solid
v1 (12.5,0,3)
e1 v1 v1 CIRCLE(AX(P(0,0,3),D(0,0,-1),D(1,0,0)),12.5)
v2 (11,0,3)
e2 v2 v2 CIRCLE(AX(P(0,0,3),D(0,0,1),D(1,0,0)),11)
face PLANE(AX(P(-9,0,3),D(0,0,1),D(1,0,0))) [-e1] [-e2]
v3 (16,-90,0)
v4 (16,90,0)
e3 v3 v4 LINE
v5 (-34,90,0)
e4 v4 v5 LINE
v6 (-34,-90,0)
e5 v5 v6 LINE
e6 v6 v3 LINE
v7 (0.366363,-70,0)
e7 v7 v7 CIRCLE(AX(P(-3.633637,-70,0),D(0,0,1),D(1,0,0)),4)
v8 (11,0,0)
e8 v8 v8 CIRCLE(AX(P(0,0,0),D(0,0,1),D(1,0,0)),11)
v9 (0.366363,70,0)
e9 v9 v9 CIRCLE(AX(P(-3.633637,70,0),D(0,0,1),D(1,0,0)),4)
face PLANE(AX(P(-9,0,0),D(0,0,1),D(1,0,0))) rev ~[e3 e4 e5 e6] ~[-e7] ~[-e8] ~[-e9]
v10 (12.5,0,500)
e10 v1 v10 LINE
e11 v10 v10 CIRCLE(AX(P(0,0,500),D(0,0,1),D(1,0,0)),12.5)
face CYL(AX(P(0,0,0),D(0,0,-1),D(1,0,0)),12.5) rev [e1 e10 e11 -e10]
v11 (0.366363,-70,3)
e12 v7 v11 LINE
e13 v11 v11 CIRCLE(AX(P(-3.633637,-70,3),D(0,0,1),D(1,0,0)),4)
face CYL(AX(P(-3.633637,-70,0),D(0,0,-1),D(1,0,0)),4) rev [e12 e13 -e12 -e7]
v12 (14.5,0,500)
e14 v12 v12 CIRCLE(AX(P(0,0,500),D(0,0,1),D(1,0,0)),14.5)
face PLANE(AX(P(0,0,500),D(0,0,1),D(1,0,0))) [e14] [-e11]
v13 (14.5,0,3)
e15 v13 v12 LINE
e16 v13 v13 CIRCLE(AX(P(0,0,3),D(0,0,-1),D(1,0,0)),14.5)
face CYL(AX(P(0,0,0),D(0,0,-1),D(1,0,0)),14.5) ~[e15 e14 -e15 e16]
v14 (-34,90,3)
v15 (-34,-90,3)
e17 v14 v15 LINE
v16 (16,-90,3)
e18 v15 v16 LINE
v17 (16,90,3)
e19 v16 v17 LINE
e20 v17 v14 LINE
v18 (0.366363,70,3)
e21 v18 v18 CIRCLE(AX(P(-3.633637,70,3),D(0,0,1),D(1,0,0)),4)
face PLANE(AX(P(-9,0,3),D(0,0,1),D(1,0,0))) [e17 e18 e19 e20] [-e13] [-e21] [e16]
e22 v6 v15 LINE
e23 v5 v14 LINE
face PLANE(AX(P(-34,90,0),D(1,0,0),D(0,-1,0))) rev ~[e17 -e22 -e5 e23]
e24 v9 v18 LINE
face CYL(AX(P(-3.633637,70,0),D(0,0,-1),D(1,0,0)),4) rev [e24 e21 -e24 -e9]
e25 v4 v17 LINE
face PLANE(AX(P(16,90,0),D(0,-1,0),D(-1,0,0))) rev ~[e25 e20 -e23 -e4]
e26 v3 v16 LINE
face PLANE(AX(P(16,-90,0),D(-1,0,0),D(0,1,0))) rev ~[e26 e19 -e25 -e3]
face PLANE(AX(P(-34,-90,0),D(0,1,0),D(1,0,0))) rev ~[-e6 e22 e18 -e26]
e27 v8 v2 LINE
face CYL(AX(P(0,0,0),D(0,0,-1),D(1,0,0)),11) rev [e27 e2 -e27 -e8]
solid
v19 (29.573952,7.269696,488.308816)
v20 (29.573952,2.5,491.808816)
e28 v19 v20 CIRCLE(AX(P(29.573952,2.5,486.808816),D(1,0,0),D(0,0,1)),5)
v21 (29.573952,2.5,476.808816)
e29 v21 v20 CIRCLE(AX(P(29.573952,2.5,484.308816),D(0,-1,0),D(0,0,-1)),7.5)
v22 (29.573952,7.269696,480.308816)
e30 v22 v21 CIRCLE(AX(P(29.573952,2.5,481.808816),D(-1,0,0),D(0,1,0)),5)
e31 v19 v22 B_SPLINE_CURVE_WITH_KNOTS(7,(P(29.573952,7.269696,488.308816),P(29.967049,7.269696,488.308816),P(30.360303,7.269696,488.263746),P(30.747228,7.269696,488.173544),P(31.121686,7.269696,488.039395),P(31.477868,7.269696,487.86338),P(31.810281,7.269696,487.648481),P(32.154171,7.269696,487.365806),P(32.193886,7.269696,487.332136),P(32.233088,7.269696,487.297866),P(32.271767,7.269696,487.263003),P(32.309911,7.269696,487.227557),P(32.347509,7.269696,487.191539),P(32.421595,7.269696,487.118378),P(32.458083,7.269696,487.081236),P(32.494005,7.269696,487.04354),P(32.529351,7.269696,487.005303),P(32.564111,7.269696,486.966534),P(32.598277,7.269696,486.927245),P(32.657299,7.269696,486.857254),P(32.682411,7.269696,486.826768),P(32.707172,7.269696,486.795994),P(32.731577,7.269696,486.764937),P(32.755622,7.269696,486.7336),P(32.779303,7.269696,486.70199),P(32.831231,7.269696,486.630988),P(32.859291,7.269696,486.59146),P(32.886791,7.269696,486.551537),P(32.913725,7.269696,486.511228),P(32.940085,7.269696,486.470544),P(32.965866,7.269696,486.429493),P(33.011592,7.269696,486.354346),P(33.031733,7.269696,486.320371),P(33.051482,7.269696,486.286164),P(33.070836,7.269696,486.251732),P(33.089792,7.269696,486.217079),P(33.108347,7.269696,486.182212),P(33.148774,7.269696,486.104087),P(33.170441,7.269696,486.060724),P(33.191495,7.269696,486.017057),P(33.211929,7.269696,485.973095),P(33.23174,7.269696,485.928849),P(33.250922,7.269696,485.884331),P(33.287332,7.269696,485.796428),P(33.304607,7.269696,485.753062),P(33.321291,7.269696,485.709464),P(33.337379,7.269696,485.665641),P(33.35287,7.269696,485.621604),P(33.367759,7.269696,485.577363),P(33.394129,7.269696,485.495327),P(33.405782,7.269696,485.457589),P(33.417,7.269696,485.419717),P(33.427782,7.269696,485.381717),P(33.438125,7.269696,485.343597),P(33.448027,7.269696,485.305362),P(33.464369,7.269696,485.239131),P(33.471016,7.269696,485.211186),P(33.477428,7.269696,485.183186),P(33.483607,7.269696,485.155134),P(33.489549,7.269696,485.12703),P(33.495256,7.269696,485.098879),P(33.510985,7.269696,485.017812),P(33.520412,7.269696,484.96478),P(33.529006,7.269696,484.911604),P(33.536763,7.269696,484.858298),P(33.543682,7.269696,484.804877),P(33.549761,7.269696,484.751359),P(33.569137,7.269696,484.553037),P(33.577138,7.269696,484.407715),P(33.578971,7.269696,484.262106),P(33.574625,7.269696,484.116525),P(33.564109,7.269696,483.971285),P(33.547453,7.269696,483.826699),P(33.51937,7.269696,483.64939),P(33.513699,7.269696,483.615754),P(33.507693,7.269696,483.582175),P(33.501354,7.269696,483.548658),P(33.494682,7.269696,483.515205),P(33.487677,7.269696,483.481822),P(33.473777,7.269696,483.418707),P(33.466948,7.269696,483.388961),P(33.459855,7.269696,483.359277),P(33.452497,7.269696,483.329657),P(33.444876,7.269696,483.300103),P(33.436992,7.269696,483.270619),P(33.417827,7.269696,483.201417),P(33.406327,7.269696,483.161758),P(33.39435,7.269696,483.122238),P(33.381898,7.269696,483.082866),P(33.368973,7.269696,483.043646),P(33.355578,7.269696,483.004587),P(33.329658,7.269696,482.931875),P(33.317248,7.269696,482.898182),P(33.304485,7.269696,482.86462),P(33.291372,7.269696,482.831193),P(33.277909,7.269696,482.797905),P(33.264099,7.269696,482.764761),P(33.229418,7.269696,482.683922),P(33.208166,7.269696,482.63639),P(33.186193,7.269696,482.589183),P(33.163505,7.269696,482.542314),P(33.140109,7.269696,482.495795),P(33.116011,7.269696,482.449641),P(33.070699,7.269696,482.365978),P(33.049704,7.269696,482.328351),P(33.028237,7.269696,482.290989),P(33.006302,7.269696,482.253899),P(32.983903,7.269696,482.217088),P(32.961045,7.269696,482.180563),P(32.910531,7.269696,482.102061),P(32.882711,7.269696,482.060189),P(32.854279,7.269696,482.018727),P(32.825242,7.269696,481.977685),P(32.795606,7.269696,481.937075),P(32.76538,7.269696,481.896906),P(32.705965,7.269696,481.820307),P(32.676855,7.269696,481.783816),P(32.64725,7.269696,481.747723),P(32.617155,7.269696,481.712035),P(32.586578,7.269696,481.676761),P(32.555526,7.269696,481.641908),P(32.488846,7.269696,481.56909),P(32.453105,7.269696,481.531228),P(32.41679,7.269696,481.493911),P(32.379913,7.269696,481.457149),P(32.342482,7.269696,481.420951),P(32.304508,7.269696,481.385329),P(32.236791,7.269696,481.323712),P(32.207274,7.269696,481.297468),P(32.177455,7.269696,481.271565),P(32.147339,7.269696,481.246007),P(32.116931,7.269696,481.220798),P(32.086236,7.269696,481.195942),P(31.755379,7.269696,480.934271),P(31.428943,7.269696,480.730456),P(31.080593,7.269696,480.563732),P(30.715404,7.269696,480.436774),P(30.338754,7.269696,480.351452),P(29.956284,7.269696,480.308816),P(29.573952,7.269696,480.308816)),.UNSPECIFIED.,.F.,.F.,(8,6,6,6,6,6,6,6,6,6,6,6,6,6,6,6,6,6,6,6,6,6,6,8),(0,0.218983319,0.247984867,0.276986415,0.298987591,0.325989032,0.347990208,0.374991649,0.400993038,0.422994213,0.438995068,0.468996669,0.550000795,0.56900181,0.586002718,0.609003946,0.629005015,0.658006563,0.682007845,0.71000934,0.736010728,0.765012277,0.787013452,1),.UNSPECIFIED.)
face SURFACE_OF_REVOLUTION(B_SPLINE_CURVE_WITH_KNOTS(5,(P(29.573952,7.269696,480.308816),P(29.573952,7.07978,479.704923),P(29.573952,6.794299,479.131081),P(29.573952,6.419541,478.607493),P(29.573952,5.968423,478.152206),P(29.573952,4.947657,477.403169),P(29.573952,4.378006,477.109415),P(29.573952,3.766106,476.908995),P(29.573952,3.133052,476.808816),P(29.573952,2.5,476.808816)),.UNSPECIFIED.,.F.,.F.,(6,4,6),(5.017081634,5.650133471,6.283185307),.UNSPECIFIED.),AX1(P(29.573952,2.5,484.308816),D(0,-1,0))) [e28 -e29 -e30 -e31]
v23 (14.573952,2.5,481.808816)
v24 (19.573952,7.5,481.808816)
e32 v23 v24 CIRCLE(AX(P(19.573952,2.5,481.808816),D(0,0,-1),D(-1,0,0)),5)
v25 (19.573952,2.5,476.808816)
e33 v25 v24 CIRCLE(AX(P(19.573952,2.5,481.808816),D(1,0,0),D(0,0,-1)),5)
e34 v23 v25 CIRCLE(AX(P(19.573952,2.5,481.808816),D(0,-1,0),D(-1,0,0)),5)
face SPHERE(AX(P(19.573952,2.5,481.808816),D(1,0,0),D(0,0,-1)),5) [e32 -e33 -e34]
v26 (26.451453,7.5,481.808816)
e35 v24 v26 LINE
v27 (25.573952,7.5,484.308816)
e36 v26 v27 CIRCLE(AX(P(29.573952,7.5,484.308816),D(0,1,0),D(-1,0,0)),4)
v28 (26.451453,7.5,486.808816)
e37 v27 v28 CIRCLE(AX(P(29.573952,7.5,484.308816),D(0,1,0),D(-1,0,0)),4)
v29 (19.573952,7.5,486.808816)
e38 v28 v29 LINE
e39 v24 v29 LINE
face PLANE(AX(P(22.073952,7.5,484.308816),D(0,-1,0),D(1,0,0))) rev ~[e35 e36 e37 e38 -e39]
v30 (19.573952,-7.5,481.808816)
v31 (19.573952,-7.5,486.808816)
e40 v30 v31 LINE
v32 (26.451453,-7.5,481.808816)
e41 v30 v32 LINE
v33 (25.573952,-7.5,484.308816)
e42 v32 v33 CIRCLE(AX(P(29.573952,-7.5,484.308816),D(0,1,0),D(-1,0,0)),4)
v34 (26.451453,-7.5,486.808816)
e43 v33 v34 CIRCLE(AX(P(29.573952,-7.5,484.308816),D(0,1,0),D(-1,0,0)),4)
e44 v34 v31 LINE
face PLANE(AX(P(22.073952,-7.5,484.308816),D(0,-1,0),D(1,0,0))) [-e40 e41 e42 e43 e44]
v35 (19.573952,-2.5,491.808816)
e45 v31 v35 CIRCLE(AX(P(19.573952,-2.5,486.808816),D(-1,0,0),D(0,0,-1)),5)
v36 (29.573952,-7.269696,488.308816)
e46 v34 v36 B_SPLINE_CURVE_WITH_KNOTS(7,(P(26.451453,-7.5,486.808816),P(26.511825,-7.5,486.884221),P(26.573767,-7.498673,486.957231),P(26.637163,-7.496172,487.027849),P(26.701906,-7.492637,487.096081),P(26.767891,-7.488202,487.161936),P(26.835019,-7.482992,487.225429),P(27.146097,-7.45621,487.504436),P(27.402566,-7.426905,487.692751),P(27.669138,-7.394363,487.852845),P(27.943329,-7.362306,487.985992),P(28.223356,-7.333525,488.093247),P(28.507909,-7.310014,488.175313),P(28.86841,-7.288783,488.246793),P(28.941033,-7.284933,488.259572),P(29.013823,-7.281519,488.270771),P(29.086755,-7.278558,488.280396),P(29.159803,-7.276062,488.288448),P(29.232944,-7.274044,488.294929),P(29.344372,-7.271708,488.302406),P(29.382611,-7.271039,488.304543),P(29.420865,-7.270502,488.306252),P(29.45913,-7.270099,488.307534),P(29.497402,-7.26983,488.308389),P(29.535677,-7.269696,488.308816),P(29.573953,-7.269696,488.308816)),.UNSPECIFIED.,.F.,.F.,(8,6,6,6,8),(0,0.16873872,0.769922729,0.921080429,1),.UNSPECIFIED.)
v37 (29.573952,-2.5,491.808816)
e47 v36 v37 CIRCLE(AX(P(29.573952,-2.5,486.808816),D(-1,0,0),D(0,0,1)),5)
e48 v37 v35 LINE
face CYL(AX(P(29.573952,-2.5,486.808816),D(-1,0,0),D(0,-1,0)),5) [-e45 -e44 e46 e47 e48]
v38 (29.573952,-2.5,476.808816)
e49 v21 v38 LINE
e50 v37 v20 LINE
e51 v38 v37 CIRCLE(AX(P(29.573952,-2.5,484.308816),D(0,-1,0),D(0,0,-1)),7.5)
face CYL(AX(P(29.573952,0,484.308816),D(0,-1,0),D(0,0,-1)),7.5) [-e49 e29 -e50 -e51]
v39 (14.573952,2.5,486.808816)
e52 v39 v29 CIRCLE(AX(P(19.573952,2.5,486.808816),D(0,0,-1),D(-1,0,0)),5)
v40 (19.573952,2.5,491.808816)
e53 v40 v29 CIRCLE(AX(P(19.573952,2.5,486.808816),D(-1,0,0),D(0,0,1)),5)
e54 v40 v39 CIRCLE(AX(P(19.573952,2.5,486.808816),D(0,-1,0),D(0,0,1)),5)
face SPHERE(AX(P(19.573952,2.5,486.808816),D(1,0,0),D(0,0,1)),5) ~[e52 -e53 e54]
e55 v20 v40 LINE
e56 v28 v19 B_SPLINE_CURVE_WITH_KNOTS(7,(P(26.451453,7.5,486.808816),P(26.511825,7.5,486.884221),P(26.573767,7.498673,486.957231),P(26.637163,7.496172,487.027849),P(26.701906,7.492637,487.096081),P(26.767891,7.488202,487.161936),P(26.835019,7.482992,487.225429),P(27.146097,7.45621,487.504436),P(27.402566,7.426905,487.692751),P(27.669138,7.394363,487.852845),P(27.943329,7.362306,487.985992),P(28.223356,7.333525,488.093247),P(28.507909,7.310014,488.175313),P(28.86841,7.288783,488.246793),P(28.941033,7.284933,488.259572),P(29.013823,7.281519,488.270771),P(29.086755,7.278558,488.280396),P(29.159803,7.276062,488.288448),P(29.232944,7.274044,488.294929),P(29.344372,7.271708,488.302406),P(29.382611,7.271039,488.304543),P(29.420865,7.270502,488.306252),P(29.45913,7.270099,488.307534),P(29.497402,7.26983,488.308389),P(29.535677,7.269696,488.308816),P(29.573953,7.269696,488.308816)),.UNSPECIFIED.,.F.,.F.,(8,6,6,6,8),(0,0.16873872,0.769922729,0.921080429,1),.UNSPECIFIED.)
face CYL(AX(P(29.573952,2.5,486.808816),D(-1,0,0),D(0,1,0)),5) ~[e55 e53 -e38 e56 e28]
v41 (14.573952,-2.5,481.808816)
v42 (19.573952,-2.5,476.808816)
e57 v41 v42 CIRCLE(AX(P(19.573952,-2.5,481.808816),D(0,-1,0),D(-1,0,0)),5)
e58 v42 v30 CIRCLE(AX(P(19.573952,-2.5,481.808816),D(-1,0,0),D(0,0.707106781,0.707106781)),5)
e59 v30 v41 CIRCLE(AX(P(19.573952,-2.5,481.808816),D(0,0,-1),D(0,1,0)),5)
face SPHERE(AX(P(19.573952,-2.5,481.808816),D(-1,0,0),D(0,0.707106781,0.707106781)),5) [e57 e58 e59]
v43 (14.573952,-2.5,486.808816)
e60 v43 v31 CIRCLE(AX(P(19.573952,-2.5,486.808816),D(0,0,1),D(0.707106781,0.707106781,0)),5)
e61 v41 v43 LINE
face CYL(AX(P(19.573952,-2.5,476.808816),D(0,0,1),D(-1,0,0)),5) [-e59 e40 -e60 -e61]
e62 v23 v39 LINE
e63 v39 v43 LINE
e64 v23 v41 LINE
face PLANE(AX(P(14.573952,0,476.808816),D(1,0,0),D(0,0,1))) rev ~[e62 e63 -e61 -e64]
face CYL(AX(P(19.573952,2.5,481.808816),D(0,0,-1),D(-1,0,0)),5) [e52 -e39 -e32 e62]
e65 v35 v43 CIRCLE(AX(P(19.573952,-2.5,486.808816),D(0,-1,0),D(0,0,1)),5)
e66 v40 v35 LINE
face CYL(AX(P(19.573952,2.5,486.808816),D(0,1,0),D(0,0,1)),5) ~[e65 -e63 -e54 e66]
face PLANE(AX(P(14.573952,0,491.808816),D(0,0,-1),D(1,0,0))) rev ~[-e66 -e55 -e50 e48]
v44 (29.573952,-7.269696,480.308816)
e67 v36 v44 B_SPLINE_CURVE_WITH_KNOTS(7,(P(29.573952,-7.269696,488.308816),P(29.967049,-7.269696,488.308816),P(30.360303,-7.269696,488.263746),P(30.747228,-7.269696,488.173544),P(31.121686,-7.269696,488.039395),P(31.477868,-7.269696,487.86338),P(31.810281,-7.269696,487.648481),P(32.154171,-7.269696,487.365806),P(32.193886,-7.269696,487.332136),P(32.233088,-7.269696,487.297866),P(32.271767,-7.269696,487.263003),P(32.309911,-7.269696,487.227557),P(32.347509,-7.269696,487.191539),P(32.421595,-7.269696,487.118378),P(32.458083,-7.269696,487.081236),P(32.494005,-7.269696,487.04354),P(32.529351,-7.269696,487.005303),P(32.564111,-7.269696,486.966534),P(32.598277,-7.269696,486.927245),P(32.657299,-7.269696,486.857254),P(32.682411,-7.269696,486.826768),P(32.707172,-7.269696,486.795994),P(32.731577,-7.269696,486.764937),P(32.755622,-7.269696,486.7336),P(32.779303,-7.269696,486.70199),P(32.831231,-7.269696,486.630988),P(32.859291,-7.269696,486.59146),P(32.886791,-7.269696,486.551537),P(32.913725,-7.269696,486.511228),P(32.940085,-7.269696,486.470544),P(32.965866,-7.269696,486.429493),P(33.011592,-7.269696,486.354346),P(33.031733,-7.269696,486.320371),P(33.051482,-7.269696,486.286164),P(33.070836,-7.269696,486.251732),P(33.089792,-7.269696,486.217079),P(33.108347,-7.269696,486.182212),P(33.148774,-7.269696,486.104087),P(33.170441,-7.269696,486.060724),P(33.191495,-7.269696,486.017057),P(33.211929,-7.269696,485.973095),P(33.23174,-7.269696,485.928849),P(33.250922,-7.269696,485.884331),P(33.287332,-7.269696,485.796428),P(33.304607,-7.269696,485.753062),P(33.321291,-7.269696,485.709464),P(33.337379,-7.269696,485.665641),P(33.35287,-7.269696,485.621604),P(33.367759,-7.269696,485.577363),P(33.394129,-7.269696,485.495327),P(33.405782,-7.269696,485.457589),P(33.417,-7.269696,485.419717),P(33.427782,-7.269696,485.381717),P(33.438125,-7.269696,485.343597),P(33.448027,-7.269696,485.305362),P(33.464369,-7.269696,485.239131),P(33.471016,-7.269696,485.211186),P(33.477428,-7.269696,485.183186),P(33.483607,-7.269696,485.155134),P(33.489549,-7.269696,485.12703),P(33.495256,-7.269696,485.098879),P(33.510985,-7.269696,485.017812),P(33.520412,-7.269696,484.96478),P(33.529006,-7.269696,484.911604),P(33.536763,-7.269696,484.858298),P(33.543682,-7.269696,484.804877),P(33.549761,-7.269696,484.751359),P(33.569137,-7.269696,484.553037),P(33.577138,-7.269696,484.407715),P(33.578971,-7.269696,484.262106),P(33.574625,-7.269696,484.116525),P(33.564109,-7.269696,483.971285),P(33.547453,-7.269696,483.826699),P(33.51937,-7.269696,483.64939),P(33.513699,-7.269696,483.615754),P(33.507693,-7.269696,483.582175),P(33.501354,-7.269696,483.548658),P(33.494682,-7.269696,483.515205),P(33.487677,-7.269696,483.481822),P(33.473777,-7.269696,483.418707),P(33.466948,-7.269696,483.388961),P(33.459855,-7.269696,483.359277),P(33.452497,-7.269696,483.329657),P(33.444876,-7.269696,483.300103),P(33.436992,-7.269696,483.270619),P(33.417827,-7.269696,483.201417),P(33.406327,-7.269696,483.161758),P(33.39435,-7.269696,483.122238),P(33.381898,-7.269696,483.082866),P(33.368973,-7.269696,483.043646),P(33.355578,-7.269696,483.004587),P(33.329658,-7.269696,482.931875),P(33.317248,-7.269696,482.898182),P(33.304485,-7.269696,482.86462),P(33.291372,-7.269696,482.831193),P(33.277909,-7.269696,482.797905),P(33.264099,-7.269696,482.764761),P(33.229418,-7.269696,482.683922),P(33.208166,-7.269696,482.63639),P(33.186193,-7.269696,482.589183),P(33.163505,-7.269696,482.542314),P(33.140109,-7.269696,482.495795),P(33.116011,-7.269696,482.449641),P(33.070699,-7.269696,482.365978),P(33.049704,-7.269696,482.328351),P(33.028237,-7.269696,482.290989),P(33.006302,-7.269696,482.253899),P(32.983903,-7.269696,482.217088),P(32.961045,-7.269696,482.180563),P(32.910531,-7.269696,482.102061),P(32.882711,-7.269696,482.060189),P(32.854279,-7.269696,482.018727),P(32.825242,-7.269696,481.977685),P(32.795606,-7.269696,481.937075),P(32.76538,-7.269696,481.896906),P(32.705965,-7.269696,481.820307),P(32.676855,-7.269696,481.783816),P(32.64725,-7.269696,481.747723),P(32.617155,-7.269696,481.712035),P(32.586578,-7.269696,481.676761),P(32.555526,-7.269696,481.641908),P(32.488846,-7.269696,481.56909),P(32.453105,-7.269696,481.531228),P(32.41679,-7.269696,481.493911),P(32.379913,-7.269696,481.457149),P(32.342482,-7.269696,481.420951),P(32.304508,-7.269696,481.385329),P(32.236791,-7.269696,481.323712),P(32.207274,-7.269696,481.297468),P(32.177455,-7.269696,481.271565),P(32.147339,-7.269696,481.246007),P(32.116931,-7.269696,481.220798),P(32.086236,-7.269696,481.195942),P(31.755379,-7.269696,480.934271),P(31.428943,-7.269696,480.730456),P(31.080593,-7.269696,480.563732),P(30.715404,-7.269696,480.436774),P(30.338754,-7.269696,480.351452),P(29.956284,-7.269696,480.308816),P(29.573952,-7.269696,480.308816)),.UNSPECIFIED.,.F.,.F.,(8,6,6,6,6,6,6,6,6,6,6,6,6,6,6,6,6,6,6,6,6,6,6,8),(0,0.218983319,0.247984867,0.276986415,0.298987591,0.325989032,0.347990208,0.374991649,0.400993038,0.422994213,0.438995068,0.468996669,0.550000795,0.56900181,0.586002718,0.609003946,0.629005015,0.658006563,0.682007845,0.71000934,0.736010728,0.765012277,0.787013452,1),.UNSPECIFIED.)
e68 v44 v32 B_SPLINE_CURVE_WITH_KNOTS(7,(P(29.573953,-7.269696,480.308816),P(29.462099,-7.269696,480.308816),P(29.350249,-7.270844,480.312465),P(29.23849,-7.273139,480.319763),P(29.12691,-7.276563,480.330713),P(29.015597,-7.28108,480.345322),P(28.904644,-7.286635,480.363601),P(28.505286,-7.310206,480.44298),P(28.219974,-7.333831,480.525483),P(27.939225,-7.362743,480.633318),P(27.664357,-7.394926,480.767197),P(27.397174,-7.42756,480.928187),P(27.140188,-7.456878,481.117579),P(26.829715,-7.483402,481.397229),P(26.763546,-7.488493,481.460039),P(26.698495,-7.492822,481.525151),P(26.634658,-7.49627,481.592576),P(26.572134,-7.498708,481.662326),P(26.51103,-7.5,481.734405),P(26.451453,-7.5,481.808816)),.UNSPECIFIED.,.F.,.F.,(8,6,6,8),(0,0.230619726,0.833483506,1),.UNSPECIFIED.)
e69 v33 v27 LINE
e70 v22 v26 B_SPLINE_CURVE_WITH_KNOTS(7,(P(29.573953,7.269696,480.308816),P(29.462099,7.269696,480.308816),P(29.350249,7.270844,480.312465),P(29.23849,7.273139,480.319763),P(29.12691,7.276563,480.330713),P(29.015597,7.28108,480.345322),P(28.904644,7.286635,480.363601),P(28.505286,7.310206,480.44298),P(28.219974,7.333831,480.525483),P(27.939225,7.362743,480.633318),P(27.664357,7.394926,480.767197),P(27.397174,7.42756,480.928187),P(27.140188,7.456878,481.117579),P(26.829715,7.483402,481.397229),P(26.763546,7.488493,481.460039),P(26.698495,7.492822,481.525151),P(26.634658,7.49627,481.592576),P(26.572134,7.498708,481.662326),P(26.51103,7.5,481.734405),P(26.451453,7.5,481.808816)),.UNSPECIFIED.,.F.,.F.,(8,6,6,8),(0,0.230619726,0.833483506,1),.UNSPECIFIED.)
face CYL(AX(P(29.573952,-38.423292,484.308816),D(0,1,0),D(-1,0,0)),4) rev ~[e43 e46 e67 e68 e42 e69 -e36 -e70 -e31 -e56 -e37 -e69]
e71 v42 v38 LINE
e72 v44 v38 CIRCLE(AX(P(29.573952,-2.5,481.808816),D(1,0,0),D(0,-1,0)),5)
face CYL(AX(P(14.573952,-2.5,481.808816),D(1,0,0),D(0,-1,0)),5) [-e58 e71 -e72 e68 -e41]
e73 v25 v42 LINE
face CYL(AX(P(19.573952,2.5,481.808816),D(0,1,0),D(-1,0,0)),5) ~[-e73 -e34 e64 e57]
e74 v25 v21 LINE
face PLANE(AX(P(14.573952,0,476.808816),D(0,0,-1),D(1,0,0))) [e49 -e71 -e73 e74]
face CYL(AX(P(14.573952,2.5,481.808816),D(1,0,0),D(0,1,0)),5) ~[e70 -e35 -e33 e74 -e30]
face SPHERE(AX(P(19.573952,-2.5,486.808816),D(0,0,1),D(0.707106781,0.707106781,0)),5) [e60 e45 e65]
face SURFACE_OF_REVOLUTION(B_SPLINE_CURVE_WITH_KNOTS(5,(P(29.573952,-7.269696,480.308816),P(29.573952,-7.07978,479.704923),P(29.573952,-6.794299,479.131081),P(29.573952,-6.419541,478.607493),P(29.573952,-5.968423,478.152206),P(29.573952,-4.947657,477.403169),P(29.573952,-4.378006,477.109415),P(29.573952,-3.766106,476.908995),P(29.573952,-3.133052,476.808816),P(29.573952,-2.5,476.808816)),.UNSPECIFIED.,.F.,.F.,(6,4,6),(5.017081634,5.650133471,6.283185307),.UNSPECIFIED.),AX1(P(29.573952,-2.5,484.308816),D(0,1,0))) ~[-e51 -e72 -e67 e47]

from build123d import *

# Parameters (mm, degrees)
F0_R         = 14.5
F0_R_2       = 12.5
F1_DEPTH     = 500
F2_R         = 4
F2_R_2       = 11
F3_DEPTH     = 3
F4_W         = 15
F4_H         = 15
F5_DEPTH     = 7.5
F6_R         = 5
F7_T1_DEPTH  = 5
F7_T3_DEPTH  = 5
F7_S7_W      = 5
F7_S7_H      = 5
F7_T8_DEPTH  = 5
F7_S13_W     = 5
F7_S13_H     = 5
F7_T14_DEPTH = 5
F7_T18_ANGLE = 90
F7_T20_ANGLE = 90
F9_D         = 8


# Not quite as in the source:
# - a fillet or chamfer that OpenCascade refuses, or shapes differently, is made with other operations: its cross-section is extruded or revolved along the edge and cut away or added


with BuildPart() as f1:
    # F0 (on Top) → F1 (new body)
    with BuildSketch(Plane.XY):
        Circle(F0_R)
        Circle(F0_R_2, mode=Mode.SUBTRACT)
    extrude(amount=F1_DEPTH)

    # F2 (on Top) → F3 (join)
    with BuildSketch(Plane.XY):
        Polygon((16, -90), (16, 0), (16, 90), (-34, 90), (-34, -90), align=None)
        with Locations((-3.6336369812, -70)):
            Circle(F2_R, mode=Mode.SUBTRACT)
        Circle(F2_R_2, mode=Mode.SUBTRACT)
        with Locations((-3.6336369812, 70)):
            Circle(F2_R, mode=Mode.SUBTRACT)
    extrude(amount=F3_DEPTH)


with BuildPart() as f5:
    # F4 (on Front) → F5 (new body, symmetric)
    with BuildSketch(Plane.XZ):
        with Locations((22.0739521831, 484.3088161945)):
            Rectangle(F4_W, F4_H)
        with BuildLine():
            ThreePointArc((29.5739521831, 476.8088161945), (37.0739521831, 484.3088161945), (29.5739521831, 491.8088161945))
            Line((29.5739521831, 491.8088161945), (29.5739521831, 476.8088161945))
        make_face()
    extrude(amount=F5_DEPTH, both=True)

    # F6
    f6_edges = [f5.edges().sort_by_distance(p)[0] for p in [
        (14.573952, -7.5, 484.308816),
        (37.073952, -7.5, 484.308816),
        (22.073952, 7.5, 476.808816),
    ]]
    fillet(f6_edges, radius=F6_R)

    # F7: fillet of radius 5 on 1 edges, made by hand

    # F7_s2 → F7_t1 (cut)
    with BuildSketch(Plane.XY.offset(481.8088161945)):
        with BuildLine():
            ThreePointArc((14.5739521831, 2.5), (16.0384182772, 6.0355339059), (19.5739521831, 7.5))
            Line((19.5739521831, 7.5), (14.5739521831, 7.5))
            Line((14.5739521831, 7.5), (14.5739521831, 2.5))
        make_face()
    extrude(amount=F7_T1_DEPTH, mode=Mode.SUBTRACT)

    # F7_s4 → F7_t3 (cut)
    with BuildSketch(Plane.XZ.offset(-2.5)):
        with BuildLine():
            ThreePointArc((14.5739521831, 481.8088161945), (16.0384182772, 478.2732822886), (19.5739521831, 476.8088161945))
            Line((19.5739521831, 476.8088161945), (14.5739521831, 476.8088161945))
            Line((14.5739521831, 476.8088161945), (14.5739521831, 481.8088161945))
        make_face()
        with BuildLine():
            ThreePointArc((19.5739521831, 491.8088161945), (16.0384182772, 490.3443501005), (14.5739521831, 486.8088161945))
            Line((14.5739521831, 486.8088161945), (14.5739521831, 491.8088161945))
            Line((14.5739521831, 491.8088161945), (19.5739521831, 491.8088161945))
        make_face()
    extrude(amount=F7_T3_DEPTH, mode=Mode.SUBTRACT)


with BuildPart() as f7_tool6:
    # F7_s7 → F7_t8 (new body)
    with BuildSketch(Plane.YZ.offset(19.5739521831)):
        with Locations((-5, 479.3088161945)):
            Rectangle(F7_S7_W, F7_S7_H)
    extrude(amount=-F7_T8_DEPTH)

    # F7_s9 → F7_t10 (revolve, cut)
    with BuildSketch(Plane(origin=(19.5739521831, -2.5, 481.8088161945), x_dir=(0, 0.7071067812, 0.7071067812), z_dir=(0, -0.7071067812, 0.7071067812))):
        with BuildLine():
            ThreePointArc((0, -5), (5, 0), (0, 5))
            Line((0, 5), (0, -5))
        make_face()
    revolve(axis=Axis((19.5739521831, -2.5, 481.8088161945), (-1, 0, 0)), mode=Mode.SUBTRACT)


with BuildPart() as f5_1:
    add(f5.part)

    # F7_t5: cut F7_tool6
    add(f7_tool6.part, mode=Mode.SUBTRACT)


with BuildPart() as f7_tool12:
    # F7_s13 → F7_t14 (new body)
    with BuildSketch(Plane.XY.offset(486.8088161945)):
        with Locations((17.0739521831, -5)):
            Rectangle(F7_S13_W, F7_S13_H)
    extrude(amount=F7_T14_DEPTH)

    # F7_s15 → F7_t16 (revolve, cut)
    with BuildSketch(Plane(origin=(19.5739521831, -2.5, 486.8088161945), x_dir=(0.7071067812, 0.7071067812, 0), z_dir=(0.7071067812, -0.7071067812, 0))):
        with BuildLine():
            ThreePointArc((0, -5), (5, 0), (0, 5))
            Line((0, 5), (0, -5))
        make_face()
    revolve(axis=Axis((19.5739521831, -2.5, 486.8088161945), (0, 0, 1)), mode=Mode.SUBTRACT)


with BuildPart() as f5_2:
    add(f5_1.part)

    # F7_t11: cut F7_tool12
    add(f7_tool12.part, mode=Mode.SUBTRACT)

    # F7_s17 → F7_t18 (revolve, cut)
    with BuildSketch(Plane.XZ.offset(-2.5)):
        with BuildLine():
            ThreePointArc((14.5739521831, 486.8088161945), (16.0384182772, 490.3443501005), (19.5739521831, 491.8088161945))
            Line((19.5739521831, 491.8088161945), (14.5739521831, 491.8088161945))
            Line((14.5739521831, 491.8088161945), (14.5739521831, 486.8088161945))
        make_face()
    revolve(axis=Axis((14.5739521831, 2.5, 486.8088161945), (-1, 0, 0)), revolution_arc=F7_T18_ANGLE, mode=Mode.SUBTRACT)

    # F7_s19 → F7_t20 (revolve, cut)
    with BuildSketch(Plane.XZ.offset(-2.5)):
        with BuildLine():
            ThreePointArc((14.5739521831, 481.8088161945), (16.0384182772, 478.2732822886), (19.5739521831, 476.8088161945))
            Line((19.5739521831, 476.8088161945), (14.5739521831, 476.8088161945))
            Line((14.5739521831, 476.8088161945), (14.5739521831, 481.8088161945))
        make_face()
    revolve(axis=Axis((14.5739521831, 2.5, 481.8088161945), (1, 0, 0)), revolution_arc=F7_T20_ANGLE, mode=Mode.SUBTRACT)

    # F9 (through all)
    with Locations(Plane.XZ.offset(7.5)):
        with Locations((29.5739521831, 484.3088161945)):
            Hole(F9_D / 2)


solid = Compound([f1.part, f5_2.part])
